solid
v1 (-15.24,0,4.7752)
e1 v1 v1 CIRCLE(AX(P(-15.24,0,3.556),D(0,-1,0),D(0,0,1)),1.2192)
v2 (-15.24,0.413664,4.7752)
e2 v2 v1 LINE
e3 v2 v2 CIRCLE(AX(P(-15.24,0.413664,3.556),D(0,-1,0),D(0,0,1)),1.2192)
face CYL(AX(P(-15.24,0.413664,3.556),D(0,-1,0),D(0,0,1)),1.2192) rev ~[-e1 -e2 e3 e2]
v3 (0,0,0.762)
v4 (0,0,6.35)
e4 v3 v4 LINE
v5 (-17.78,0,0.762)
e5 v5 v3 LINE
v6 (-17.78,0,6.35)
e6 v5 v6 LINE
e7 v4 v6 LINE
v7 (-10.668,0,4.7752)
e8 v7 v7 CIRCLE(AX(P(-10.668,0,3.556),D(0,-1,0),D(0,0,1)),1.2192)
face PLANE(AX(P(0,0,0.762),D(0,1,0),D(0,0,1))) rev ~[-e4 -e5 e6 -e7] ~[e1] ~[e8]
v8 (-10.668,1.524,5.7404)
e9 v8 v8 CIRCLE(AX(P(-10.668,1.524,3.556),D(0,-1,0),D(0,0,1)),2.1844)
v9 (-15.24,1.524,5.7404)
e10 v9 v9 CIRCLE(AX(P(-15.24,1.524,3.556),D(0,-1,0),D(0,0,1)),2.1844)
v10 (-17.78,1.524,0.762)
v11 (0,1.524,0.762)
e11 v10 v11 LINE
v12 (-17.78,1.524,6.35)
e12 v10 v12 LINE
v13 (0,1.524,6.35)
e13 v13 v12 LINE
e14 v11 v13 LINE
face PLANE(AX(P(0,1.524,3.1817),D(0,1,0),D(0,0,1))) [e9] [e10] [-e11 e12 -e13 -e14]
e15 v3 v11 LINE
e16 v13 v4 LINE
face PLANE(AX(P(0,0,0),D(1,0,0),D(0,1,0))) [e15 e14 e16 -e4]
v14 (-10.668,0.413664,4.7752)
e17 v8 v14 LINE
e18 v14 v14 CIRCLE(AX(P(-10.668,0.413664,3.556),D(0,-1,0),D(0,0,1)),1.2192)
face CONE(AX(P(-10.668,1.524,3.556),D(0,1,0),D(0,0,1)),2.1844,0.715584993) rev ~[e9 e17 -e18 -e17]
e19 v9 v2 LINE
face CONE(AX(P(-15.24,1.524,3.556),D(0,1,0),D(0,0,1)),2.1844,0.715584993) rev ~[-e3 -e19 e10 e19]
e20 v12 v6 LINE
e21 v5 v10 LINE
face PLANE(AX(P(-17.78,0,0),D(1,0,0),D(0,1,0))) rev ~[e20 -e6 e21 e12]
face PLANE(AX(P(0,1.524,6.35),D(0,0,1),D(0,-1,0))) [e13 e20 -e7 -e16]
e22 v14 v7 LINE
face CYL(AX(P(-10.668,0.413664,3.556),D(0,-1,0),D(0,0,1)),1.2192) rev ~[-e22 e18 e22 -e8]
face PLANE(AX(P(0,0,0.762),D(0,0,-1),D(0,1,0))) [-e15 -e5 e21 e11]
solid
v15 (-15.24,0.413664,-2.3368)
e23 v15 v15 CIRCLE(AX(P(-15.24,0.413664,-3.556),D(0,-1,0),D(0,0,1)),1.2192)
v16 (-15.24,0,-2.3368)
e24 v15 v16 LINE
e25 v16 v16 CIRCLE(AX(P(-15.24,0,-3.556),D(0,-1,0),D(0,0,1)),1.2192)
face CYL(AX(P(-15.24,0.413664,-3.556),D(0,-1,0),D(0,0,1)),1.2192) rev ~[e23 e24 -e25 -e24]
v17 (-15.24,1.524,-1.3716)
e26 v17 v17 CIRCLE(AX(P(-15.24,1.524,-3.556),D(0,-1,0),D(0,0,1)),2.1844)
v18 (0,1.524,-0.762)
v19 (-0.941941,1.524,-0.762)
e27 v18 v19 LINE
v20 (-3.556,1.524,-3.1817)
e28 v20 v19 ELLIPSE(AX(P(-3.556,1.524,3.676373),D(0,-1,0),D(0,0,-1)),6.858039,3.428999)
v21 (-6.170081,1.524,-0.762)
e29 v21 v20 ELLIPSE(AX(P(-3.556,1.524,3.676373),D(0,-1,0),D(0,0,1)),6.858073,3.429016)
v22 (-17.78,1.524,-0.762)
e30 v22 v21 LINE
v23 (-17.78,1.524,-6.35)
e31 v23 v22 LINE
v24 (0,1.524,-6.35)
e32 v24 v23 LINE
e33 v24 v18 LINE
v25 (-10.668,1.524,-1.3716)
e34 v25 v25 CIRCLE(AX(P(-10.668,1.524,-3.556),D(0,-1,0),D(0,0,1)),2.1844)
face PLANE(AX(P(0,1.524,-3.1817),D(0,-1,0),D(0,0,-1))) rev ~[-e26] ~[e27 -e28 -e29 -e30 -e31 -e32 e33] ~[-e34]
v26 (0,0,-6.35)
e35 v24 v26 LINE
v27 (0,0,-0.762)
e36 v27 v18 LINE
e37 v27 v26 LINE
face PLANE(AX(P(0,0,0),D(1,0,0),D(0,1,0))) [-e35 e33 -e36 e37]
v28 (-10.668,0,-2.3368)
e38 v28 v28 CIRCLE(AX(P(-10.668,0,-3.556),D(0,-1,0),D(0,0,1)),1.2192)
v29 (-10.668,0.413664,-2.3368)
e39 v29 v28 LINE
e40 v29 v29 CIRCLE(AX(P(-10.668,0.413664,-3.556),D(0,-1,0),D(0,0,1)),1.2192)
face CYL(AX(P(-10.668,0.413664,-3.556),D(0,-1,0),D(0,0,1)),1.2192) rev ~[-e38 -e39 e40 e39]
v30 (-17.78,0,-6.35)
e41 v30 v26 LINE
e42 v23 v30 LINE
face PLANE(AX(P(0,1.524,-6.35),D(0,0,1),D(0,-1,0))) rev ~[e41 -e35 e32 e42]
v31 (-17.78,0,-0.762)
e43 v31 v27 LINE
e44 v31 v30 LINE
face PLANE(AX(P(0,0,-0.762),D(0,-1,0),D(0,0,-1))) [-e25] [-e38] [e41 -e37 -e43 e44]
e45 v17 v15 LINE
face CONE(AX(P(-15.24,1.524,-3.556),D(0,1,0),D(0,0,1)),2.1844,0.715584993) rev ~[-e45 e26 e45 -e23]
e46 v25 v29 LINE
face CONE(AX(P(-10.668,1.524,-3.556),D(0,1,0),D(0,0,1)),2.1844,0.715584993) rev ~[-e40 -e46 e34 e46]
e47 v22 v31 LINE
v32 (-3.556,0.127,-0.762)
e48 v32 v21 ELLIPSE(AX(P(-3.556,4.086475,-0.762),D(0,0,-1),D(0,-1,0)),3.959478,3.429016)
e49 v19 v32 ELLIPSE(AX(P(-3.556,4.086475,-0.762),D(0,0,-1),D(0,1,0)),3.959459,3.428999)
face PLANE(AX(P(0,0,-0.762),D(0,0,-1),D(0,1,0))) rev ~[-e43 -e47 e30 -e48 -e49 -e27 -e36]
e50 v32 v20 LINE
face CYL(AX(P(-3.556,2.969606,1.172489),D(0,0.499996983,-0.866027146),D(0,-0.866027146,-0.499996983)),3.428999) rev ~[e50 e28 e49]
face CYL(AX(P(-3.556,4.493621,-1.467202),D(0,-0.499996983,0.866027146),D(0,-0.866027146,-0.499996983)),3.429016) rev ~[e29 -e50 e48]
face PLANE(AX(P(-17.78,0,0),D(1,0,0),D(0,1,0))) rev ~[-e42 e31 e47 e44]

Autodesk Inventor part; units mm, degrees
ref_plane "YZ Plane" through (0, 0, 0) normal (1, 0, 0) x (0, 1, 0)
ref_plane "XZ Plane" through (0, 0, 0) normal (0, 1, 0) x (-1, 0, 0)
sketch "Sketch1" plane through (0, 0, 0) normal (1, 0, 0) x (0, 1, 0)
  line L0 (-1.3056, 0) -> (7.8339, 0) construction
  line L1 (0, -10.9768) -> (0, 10.9768) construction
  line L2 (0, -0.762) -> (0, -6.35)
  line L3 (0, -0.762) -> (0.127, -0.762)
  line L4 (0.127, -0.762) -> (1.524, -3.1817)
  line L5 (1.524, -3.1817) -> (1.524, -6.35)
  line L6 (1.524, -6.35) -> (0, -6.35)
  circle A0 centre (3.3532, 0) radius 3.175 construction
  line L7 (2.5595, 7.8406) -> (4.147, 7.8406) construction
  line L8 (4.147, 7.8406) -> (4.147, -7.8406) construction
  line L9 (4.147, -7.8406) -> (2.5595, -7.8406) construction
  line L10 (2.5595, -7.8406) -> (2.5595, 7.8406) construction
  line L11 (2.5595, 7.8406) -> (4.147, -7.8406) construction
  line L12 (4.147, 7.8406) -> (2.5595, -7.8406) construction
  line L13 (0, 0.762) -> (0, 6.35)
  line L14 (0, 0.762) -> (0.127, 0.762)
  line L15 (0.127, 0.762) -> (1.524, 3.1817)
  line L16 (1.524, 3.1817) -> (1.524, 6.35)
  line L17 (1.524, 6.35) -> (0, 6.35)
  point P0 (0, 0)
  point P1 (2.38, -3.0222)
  point P2 (2.38, 3.0222)
  dimension "d12" = 30
  dimension "d13" = 0.127
  dimension "bearing_thickness" = 1.524
  dimension "d15" = 0.762
  dimension "d17" = 6.35
  dimension "d18" = 1.5875
  dimension "d23" = 12.7
  dimension "d52" = 3.3532
extrude "Extrusion1" add sketch "Sketch1" against normal blind 17.78
sketch "Sketch2" plane through (0, 1.524, -3.1817) normal (0, 1, 0) x (1, 0, 0)
  circle A0 centre (-3.556, -3.1817) radius 3.175 construction
  line L0 (-21.336, -3.1817) -> (3.556, -3.1817) projected
  point P0 (0, -3.1817)
  dimension "d21" = 6.35
  dimension "d22" = 3.556
sketch "Sketch3" plane through (-17.78, 0, 0) normal (-1, 0, 0) x (0, 0, 1)
  line L0 (0.762, 0.127) -> (0.762, 0) projected
  line L1 (0.762, 0) -> (6.35, 0) projected
  line L2 (6.35, 0) -> (6.35, 1.524) projected
  line L3 (6.35, 1.524) -> (3.1817, 1.524) projected
  line L4 (3.1817, 1.524) -> (0.762, 0.127) projected
  line L5 (0.762, 0) -> (6.35, 0) projected
  line L6 (6.35, 1.524) -> (0.762, 1.524)
  line L7 (0.762, 1.524) -> (0.762, 0)
  line L8 (0.762, 0) -> (6.35, 0)
  line L9 (6.35, 0) -> (6.35, 1.524)
  line L10 (0, -2.7581) -> (0, 4.2598) construction
  line L11 (-0.762, 0) -> (-6.35, 0)
  line L12 (-6.35, 0) -> (-6.35, 1.524)
  line L13 (-6.35, 1.524) -> (-0.762, 1.524)
  line L14 (-0.762, 1.524) -> (-0.762, 0)
  point P0 (0, 0)
extrude "Extrusion2" add sketch "Sketch3" against normal blind 14.224
sketch "Sketch4" plane through (-3.556, 0, 0) normal (1, 0, 0) x (0, 0, -1)
  line L0 (-3.1817, 1.524) -> (-0.762, 0.127) projected
  line L1 (3.1817, 1.524) -> (0.762, 0.127) projected
  line L2 (-0.762, 0.127) -> (-0.762, 0) projected
  line L3 (-0.762, 0.127) -> (0.762, 0.127)
  line L4 (0, -1.3056) -> (0, 7.8339) construction
  line L5 (-0.762, 1.524) -> (-3.1817, 1.524) projected
  line L6 (-3.1817, 1.524) -> (3.1817, 1.524)
  line L7 (0, 1.524) -> (0, -0.3129)
  line L8 (-0.762, 0.127) -> (0, -0.3129)
  line L9 (0.762, 0.127) -> (0, -0.3129)
  line L10 (0.762, 0) -> (6.35, 0) projected
  point P0 (0, 0)
  point P1 (0, 0.127)
  dimension "d45" = 0.3129
revolve "Revolution1" [suppressed]
sketch "Sketch5" plane through (0, 1.524, -3.1817) normal (0, 1, 0) x (1, 0, 0)
  line L0 (-17.78, -2.4197) -> (-3.556, -2.4197) construction
  line L1 (-17.78, -2.4197) -> (-17.78, 3.1683) construction
  line L2 (0, 3.1683) -> (-17.78, 3.1683) construction
  line L3 (-21.336, -3.1817) -> (3.556, -3.1817) construction
  line L4 (-3.556, -3.1817) -> (-3.556, 6.3173) construction
  point P0 (0, -3.1817)
  point P1 (-10.668, 0.3743)
  point P2 (-15.24, -6.7377)
  point P3 (-10.668, -6.7377)
  point P4 (-15.24, 0.3743)
  dimension "hole1_setback" = 7.112
  dimension "hole_lateral" = 3.556
  dimension "hole2_setback" = 11.684
hole "Hole1" at (-10.668, 1.524, -3.556) at (-15.24, 1.524, 3.556) at (-10.668, 1.524, 3.556) at (-15.24, 1.524, -3.556) direction (0, -1, 0) diameter 2.4384 depth 25.4 tip angle 118 countersink diameter 4.3688 countersink angle 82 clearance for "Flat Head Machine Screw (82)" size "#2" standard "Ansi Unified Screw Threads"
ref_plane "Work Plane1" through (0, 3.3532, 0) normal (0, 1, 0) x (-1, 0, 0)
sketch "Sketch7" plane through (-3.556, 0, 0) normal (1, 0, 0) x (0, 0, -1)
  line L0 (3.1817, 1.524) -> (0.762, 0.127) projected
  line L1 (0.542, 0) -> (4.5015, 2.286)
  line L2 (4.5015, 2.286) -> (0.542, 0)
  line L3 (-1.1725, 2.9696) -> (0.542, 0)
  line L4 (4.5015, 2.286) -> (2.787, 5.2556)
  line L5 (2.787, 5.2556) -> (-1.1725, 2.9696)
  line L6 (10.9768, 0) -> (-10.9768, 0) construction
  point P0 (0, 0)
  dimension "d46" = 3.429
  dimension "d47" = 4.572
revolve "Revolution3" cut sketch "Sketch7" angle 360 about axis through (-3.556, 5.2556, -2.787) along (0, -0.5, 0.8660254)
sketch "Sketch8" plane through (0, 0, 0) normal (1, 0, 0) x (0, 0, -1)
  line L0 (-0.762, 0.127) -> (-0.762, 0) projected
  line L1 (-6.35, 1.524) -> (-0.762, 1.524) projected
  line L2 (-0.762, 0) -> (-6.35, 0)
  line L3 (-6.35, 0) -> (-6.35, 1.524)
  line L4 (-6.35, 1.524) -> (-0.762, 1.524)
  line L5 (-0.762, 1.524) -> (-0.762, 0)
  line L6 (6.35, 0) -> (0.762, 0) projected
  line L7 (6.35, 1.524) -> (6.35, 0) projected
  line L8 (0.762, 0) -> (6.35, 0)
  line L9 (6.35, 0) -> (6.35, 1.524)
  line L10 (6.35, 1.524) -> (0.762, 1.524)
  line L11 (0.762, 1.524) -> (0.762, 0)
  point P0 (0, 0)
extrude "Extrusion3" add sketch "Sketch8" against normal blind 3.556
sketch "Sketch9" plane through (-3.556, 0, 0) normal (-1, 0, 0) x (0, 0, 1)
  line L0 (-0.542, 0) -> (-4.5015, 2.286) projected
  line L1 (-4.5015, 2.286) -> (-2.787, 5.2556) projected
  line L2 (-2.787, 5.2556) -> (1.1725, 2.9696) projected
  line L3 (1.1725, 2.9696) -> (-0.542, 0) projected
  point P0 (0, 0)
revolve "Revolution4" cut sketch "Sketch9" angle 360 about axis through (-3.556, 5.2556, -2.787) along (0, -0.5, 0.8660254)
sketch "Sketch6" plane through (0, 3.3532, 0) normal (0, 1, 0) x (-1, 0, 0)
  circle A0 centre (3.556, 0) radius 3.175 construction
  circle A1 centre (3.556, 0) radius 3.175
  line L0 (8.0772, 0) -> (-1.3462, 0) projected
  line L1 (0.381, 0) -> (6.731, 0)
  point P0 (0, 0)
revolve "Revolution2" [suppressed]
properties part number "bearing_insert"
